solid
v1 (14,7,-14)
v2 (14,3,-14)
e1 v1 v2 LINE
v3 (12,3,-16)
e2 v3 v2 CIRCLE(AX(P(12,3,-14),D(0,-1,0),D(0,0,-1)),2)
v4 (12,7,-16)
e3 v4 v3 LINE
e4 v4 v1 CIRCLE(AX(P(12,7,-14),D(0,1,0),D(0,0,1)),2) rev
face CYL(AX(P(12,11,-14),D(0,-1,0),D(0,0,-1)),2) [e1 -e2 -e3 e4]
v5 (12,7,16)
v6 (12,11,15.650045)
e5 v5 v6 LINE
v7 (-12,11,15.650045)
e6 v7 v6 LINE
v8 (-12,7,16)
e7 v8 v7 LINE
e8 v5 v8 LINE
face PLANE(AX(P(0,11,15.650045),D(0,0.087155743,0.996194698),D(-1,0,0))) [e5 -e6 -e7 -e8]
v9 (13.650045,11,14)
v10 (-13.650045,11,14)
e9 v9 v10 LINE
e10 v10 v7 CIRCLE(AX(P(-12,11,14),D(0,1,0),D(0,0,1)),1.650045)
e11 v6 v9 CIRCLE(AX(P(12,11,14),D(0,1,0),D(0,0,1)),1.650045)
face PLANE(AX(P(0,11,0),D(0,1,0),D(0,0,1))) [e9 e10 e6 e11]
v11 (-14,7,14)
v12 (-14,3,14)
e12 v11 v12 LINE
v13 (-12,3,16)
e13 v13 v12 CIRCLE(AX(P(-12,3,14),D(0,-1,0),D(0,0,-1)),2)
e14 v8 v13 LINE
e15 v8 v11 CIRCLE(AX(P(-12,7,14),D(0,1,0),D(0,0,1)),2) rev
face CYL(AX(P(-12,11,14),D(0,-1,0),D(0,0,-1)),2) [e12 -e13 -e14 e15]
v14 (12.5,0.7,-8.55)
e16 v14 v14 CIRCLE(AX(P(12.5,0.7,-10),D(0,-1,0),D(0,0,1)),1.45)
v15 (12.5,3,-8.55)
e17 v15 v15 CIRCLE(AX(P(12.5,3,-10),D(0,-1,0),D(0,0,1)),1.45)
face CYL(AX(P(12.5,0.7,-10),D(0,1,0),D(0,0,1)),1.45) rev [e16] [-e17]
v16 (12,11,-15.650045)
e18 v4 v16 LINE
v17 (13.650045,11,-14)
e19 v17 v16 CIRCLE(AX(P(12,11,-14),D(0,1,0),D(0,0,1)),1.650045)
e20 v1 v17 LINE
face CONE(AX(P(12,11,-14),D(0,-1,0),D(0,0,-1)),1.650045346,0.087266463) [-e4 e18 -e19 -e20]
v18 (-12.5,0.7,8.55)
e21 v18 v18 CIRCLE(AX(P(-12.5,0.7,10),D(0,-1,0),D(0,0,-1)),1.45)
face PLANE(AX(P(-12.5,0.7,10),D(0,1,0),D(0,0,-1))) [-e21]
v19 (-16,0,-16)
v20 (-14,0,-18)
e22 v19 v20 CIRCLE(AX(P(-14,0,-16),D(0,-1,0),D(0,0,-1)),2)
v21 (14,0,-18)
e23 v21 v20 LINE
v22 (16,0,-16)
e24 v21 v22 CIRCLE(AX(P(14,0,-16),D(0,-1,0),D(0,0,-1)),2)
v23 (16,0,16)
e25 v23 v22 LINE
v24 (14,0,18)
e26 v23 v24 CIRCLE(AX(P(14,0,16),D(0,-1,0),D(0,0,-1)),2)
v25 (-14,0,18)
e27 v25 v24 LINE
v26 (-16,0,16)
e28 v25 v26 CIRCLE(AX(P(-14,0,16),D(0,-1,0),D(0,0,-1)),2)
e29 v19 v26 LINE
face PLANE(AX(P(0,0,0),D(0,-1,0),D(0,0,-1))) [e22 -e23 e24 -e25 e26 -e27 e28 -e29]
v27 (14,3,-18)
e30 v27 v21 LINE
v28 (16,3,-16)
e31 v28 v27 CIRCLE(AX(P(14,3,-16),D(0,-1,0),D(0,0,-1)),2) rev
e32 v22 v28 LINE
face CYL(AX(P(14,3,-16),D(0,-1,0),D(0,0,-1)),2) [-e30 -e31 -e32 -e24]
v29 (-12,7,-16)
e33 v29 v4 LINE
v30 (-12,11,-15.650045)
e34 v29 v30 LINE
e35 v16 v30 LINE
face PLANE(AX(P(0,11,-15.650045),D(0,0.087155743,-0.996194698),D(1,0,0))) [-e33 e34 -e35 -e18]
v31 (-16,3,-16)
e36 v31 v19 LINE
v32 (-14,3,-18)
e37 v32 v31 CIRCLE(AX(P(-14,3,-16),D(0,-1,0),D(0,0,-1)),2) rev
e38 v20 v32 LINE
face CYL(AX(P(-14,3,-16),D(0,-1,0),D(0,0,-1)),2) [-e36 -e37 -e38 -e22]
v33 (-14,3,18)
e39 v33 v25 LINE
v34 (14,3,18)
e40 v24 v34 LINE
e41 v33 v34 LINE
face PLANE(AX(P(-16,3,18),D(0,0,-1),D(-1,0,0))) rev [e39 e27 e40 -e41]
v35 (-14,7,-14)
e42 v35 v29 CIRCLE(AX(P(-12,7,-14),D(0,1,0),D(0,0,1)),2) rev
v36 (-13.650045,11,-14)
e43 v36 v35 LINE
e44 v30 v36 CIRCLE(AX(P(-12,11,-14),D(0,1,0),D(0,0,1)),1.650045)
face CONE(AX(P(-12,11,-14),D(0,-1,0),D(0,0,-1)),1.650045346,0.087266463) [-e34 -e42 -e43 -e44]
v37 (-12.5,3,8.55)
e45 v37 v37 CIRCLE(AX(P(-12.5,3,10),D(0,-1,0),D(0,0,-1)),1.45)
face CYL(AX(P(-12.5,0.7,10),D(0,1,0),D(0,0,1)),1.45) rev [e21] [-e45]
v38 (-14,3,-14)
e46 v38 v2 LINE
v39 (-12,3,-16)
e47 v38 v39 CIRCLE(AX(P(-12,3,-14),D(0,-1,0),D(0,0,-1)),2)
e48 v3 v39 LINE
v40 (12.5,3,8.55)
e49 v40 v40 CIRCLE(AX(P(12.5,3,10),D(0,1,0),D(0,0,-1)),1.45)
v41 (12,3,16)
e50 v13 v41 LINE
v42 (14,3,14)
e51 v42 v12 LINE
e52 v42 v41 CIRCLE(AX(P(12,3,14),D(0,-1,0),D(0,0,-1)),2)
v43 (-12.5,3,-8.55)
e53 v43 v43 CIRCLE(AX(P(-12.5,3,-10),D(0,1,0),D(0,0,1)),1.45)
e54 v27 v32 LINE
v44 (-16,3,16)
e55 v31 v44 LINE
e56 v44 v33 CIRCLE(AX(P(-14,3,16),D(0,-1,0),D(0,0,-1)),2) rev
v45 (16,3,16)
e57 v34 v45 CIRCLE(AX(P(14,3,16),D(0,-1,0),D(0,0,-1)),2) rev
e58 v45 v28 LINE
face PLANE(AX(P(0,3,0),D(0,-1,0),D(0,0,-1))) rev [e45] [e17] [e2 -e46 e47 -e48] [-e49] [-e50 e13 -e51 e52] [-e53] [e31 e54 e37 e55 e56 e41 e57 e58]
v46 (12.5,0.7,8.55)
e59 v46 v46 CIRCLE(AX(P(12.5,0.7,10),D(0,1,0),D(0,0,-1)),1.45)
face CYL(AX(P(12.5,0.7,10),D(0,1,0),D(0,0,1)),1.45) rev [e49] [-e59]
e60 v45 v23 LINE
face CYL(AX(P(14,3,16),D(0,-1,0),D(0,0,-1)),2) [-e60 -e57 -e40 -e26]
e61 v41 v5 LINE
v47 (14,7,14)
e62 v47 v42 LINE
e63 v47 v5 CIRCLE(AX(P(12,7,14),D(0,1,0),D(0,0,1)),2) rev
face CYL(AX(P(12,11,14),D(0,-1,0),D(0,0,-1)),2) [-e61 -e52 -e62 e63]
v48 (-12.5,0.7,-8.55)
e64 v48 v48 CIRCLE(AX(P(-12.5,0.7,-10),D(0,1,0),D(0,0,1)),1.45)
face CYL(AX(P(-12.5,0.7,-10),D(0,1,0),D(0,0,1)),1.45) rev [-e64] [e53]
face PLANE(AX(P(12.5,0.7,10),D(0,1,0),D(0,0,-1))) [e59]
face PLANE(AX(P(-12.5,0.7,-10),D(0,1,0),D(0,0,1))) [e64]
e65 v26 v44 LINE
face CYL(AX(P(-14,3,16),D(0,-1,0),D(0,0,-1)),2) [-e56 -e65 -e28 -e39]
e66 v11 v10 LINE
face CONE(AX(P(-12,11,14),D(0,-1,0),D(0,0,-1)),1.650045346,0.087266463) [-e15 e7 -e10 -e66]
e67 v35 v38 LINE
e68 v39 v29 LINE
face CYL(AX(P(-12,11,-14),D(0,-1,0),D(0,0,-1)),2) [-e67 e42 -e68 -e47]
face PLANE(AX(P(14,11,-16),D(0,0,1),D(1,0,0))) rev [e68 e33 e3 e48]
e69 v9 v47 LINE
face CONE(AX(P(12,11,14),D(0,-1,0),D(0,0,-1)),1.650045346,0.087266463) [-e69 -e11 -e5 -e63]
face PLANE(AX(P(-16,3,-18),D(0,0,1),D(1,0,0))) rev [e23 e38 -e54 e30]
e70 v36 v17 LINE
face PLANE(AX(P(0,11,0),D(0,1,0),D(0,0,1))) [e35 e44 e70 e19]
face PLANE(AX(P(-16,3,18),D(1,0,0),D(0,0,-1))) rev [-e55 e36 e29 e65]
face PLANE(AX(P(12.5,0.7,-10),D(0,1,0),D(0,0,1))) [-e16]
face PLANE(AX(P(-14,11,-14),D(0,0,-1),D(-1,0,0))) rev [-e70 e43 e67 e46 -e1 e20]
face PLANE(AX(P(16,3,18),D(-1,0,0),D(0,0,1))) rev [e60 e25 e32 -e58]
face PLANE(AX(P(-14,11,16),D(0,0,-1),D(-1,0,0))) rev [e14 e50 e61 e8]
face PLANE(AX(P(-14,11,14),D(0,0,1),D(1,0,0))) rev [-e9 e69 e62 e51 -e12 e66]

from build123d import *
from OCP.BRepFilletAPI import BRepFilletAPI_MakeChamfer

# Parameters (mm, degrees)
SKETCH1_W                                  = 32
SKETCH1_H                                  = 36
BOSS_EXTRUDE1_DEPTH                        = 3
SKETCH4_W                                  = 28
SKETCH4_H                                  = 2
BOSS_EXTRUDE3_DEPTH                        = 8
FILLET4_R                                  = 2
CHAMFER2_SIZE                              = 4
CHAMFER2_SIZE2                             = 0.349954654
SKETCH5_R                                  = 1.45
CUT_EXTRUDE1_DEPTH                         = 2.3
MIRROR1_AT_THE_SECOND_PLANE_COPY_1_SKETC_R = 1.45
MIRROR1_AT_THE_SECOND_PLANE_COPY_1_DEPTH   = 2.3


with BuildPart() as part:
    # Sketch1 → Boss-Extrude1 (new body)
    with BuildSketch(Plane(origin=(0, 0, 0), x_dir=(1, 0, 0), z_dir=(0, 1, 0))):
        Rectangle(SKETCH1_W, SKETCH1_H)
    extrude(amount=BOSS_EXTRUDE1_DEPTH)

    # Sketch4 → Boss-Extrude3 (add)
    with BuildSketch(Plane(origin=(0, 3, 0), x_dir=(1, 0, 0), z_dir=(0, 1, 0))):
        with Locations((0, 15)):
            Rectangle(SKETCH4_W, SKETCH4_H)
        with Locations((0, -15)):
            Rectangle(SKETCH4_W, SKETCH4_H)
    extrude(amount=BOSS_EXTRUDE3_DEPTH)

    # Fillet4
    fillet4_edges = [part.edges().sort_by_distance(p)[0] for p in [
        (14, 7, -16),
        (14, 7, 16),
        (-16, 1.5, 18),
        (16, 1.5, 18),
        (-16, 1.5, -18),
        (16, 1.5, -18),
        (-14, 7, 16),
        (-14, 7, -16),
    ]]
    fillet(fillet4_edges, radius=FILLET4_R - 0.0001)  # a hair under: the kernel refuses the full size

    # Chamfer2: one chamfer whose edges measure the first distance from different faces: ONE call of the kernel's chamfer builder (chamfer() names one face for all edges)
    chamfer2_edges_1 = [part.edges().sort_by_distance(p)[0] for p in [
        (0, 11, 16),
    ]]
    chamfer2_side_1 = [part.faces().sort_by_distance(p)[0] for p in [
        (0, 7, 16),
    ]]
    chamfer2_edges_2 = [part.edges().sort_by_distance(p)[0] for p in [
        (13.414242852, 11, 15.414242852),
    ]]
    chamfer2_side_2 = [part.faces().sort_by_distance(p)[0] for p in [
        (13.414242852, 7, 15.414242852),
    ]]
    chamfer2_edges_3 = [part.edges().sort_by_distance(p)[0] for p in [
        (-13.414242852, 11, 15.414242852),
    ]]
    chamfer2_side_3 = [part.faces().sort_by_distance(p)[0] for p in [
        (-13.414242852, 7, 15.414242852),
    ]]
    chamfer2_edges_4 = [part.edges().sort_by_distance(p)[0] for p in [
        (0, 11, -16),
    ]]
    chamfer2_side_4 = [part.faces().sort_by_distance(p)[0] for p in [
        (0, 7, -16),
    ]]
    chamfer2_edges_5 = [part.edges().sort_by_distance(p)[0] for p in [
        (13.414242852, 11, -15.414242852),
    ]]
    chamfer2_side_5 = [part.faces().sort_by_distance(p)[0] for p in [
        (13.414242852, 7, -15.414242852),
    ]]
    chamfer2_edges_6 = [part.edges().sort_by_distance(p)[0] for p in [
        (-13.414242852, 11, -15.414242852),
    ]]
    chamfer2_side_6 = [part.faces().sort_by_distance(p)[0] for p in [
        (-13.414242852, 7, -15.414242852),
    ]]
    chamfer2 = BRepFilletAPI_MakeChamfer(part.part.solid().wrapped)
    for e in chamfer2_edges_1:
        chamfer2.Add(CHAMFER2_SIZE, CHAMFER2_SIZE2, e.wrapped, chamfer2_side_1[0].wrapped)  # the first distance lies on this face
    for e in chamfer2_edges_2:
        chamfer2.Add(CHAMFER2_SIZE, CHAMFER2_SIZE2, e.wrapped, chamfer2_side_2[0].wrapped)  # the first distance lies on this face
    for e in chamfer2_edges_3:
        chamfer2.Add(CHAMFER2_SIZE, CHAMFER2_SIZE2, e.wrapped, chamfer2_side_3[0].wrapped)  # the first distance lies on this face
    for e in chamfer2_edges_4:
        chamfer2.Add(CHAMFER2_SIZE, CHAMFER2_SIZE2, e.wrapped, chamfer2_side_4[0].wrapped)  # the first distance lies on this face
    for e in chamfer2_edges_5:
        chamfer2.Add(CHAMFER2_SIZE, CHAMFER2_SIZE2, e.wrapped, chamfer2_side_5[0].wrapped)  # the first distance lies on this face
    for e in chamfer2_edges_6:
        chamfer2.Add(CHAMFER2_SIZE, CHAMFER2_SIZE2, e.wrapped, chamfer2_side_6[0].wrapped)  # the first distance lies on this face
    add(Compound.cast(chamfer2.Shape()), mode=Mode.REPLACE)

    # Sketch5 → Cut-Extrude1 (cut)
    with BuildSketch(Plane(origin=(0, 3, 0), x_dir=(1, 0, 0), z_dir=(0, 1, 0))):
        with Locations(Location((-12.5, 10, 0), (0, 0, 270))):
            Circle(SKETCH5_R)
    cut_extrude1 = extrude(amount=-CUT_EXTRUDE1_DEPTH, mode=Mode.SUBTRACT)

    # Mirror1: Cut-Extrude1 across plane
    add(cut_extrude1.mirror(Plane(origin=(0, 0, 0), x_dir=(0, 0, 1), z_dir=(1, 0, 0))), mode=Mode.SUBTRACT)

    # Mirror1 at the second plane: Cut-Extrude1 across plane
    add(cut_extrude1.mirror(Plane.XY), mode=Mode.SUBTRACT)

    # Mirror1 at the second plane copy 1 sketc → Mirror1 at the second plane copy 1 (cut)
    with BuildSketch(Plane(origin=(0, 3, 0), x_dir=(-1, 0, 0), z_dir=(0, 1, 0))):
        with Locations(Location((-12.5, 10, 0), (0, 0, 270))):
            Circle(MIRROR1_AT_THE_SECOND_PLANE_COPY_1_SKETC_R)
    extrude(amount=-MIRROR1_AT_THE_SECOND_PLANE_COPY_1_DEPTH, mode=Mode.SUBTRACT)


solid = part.part
